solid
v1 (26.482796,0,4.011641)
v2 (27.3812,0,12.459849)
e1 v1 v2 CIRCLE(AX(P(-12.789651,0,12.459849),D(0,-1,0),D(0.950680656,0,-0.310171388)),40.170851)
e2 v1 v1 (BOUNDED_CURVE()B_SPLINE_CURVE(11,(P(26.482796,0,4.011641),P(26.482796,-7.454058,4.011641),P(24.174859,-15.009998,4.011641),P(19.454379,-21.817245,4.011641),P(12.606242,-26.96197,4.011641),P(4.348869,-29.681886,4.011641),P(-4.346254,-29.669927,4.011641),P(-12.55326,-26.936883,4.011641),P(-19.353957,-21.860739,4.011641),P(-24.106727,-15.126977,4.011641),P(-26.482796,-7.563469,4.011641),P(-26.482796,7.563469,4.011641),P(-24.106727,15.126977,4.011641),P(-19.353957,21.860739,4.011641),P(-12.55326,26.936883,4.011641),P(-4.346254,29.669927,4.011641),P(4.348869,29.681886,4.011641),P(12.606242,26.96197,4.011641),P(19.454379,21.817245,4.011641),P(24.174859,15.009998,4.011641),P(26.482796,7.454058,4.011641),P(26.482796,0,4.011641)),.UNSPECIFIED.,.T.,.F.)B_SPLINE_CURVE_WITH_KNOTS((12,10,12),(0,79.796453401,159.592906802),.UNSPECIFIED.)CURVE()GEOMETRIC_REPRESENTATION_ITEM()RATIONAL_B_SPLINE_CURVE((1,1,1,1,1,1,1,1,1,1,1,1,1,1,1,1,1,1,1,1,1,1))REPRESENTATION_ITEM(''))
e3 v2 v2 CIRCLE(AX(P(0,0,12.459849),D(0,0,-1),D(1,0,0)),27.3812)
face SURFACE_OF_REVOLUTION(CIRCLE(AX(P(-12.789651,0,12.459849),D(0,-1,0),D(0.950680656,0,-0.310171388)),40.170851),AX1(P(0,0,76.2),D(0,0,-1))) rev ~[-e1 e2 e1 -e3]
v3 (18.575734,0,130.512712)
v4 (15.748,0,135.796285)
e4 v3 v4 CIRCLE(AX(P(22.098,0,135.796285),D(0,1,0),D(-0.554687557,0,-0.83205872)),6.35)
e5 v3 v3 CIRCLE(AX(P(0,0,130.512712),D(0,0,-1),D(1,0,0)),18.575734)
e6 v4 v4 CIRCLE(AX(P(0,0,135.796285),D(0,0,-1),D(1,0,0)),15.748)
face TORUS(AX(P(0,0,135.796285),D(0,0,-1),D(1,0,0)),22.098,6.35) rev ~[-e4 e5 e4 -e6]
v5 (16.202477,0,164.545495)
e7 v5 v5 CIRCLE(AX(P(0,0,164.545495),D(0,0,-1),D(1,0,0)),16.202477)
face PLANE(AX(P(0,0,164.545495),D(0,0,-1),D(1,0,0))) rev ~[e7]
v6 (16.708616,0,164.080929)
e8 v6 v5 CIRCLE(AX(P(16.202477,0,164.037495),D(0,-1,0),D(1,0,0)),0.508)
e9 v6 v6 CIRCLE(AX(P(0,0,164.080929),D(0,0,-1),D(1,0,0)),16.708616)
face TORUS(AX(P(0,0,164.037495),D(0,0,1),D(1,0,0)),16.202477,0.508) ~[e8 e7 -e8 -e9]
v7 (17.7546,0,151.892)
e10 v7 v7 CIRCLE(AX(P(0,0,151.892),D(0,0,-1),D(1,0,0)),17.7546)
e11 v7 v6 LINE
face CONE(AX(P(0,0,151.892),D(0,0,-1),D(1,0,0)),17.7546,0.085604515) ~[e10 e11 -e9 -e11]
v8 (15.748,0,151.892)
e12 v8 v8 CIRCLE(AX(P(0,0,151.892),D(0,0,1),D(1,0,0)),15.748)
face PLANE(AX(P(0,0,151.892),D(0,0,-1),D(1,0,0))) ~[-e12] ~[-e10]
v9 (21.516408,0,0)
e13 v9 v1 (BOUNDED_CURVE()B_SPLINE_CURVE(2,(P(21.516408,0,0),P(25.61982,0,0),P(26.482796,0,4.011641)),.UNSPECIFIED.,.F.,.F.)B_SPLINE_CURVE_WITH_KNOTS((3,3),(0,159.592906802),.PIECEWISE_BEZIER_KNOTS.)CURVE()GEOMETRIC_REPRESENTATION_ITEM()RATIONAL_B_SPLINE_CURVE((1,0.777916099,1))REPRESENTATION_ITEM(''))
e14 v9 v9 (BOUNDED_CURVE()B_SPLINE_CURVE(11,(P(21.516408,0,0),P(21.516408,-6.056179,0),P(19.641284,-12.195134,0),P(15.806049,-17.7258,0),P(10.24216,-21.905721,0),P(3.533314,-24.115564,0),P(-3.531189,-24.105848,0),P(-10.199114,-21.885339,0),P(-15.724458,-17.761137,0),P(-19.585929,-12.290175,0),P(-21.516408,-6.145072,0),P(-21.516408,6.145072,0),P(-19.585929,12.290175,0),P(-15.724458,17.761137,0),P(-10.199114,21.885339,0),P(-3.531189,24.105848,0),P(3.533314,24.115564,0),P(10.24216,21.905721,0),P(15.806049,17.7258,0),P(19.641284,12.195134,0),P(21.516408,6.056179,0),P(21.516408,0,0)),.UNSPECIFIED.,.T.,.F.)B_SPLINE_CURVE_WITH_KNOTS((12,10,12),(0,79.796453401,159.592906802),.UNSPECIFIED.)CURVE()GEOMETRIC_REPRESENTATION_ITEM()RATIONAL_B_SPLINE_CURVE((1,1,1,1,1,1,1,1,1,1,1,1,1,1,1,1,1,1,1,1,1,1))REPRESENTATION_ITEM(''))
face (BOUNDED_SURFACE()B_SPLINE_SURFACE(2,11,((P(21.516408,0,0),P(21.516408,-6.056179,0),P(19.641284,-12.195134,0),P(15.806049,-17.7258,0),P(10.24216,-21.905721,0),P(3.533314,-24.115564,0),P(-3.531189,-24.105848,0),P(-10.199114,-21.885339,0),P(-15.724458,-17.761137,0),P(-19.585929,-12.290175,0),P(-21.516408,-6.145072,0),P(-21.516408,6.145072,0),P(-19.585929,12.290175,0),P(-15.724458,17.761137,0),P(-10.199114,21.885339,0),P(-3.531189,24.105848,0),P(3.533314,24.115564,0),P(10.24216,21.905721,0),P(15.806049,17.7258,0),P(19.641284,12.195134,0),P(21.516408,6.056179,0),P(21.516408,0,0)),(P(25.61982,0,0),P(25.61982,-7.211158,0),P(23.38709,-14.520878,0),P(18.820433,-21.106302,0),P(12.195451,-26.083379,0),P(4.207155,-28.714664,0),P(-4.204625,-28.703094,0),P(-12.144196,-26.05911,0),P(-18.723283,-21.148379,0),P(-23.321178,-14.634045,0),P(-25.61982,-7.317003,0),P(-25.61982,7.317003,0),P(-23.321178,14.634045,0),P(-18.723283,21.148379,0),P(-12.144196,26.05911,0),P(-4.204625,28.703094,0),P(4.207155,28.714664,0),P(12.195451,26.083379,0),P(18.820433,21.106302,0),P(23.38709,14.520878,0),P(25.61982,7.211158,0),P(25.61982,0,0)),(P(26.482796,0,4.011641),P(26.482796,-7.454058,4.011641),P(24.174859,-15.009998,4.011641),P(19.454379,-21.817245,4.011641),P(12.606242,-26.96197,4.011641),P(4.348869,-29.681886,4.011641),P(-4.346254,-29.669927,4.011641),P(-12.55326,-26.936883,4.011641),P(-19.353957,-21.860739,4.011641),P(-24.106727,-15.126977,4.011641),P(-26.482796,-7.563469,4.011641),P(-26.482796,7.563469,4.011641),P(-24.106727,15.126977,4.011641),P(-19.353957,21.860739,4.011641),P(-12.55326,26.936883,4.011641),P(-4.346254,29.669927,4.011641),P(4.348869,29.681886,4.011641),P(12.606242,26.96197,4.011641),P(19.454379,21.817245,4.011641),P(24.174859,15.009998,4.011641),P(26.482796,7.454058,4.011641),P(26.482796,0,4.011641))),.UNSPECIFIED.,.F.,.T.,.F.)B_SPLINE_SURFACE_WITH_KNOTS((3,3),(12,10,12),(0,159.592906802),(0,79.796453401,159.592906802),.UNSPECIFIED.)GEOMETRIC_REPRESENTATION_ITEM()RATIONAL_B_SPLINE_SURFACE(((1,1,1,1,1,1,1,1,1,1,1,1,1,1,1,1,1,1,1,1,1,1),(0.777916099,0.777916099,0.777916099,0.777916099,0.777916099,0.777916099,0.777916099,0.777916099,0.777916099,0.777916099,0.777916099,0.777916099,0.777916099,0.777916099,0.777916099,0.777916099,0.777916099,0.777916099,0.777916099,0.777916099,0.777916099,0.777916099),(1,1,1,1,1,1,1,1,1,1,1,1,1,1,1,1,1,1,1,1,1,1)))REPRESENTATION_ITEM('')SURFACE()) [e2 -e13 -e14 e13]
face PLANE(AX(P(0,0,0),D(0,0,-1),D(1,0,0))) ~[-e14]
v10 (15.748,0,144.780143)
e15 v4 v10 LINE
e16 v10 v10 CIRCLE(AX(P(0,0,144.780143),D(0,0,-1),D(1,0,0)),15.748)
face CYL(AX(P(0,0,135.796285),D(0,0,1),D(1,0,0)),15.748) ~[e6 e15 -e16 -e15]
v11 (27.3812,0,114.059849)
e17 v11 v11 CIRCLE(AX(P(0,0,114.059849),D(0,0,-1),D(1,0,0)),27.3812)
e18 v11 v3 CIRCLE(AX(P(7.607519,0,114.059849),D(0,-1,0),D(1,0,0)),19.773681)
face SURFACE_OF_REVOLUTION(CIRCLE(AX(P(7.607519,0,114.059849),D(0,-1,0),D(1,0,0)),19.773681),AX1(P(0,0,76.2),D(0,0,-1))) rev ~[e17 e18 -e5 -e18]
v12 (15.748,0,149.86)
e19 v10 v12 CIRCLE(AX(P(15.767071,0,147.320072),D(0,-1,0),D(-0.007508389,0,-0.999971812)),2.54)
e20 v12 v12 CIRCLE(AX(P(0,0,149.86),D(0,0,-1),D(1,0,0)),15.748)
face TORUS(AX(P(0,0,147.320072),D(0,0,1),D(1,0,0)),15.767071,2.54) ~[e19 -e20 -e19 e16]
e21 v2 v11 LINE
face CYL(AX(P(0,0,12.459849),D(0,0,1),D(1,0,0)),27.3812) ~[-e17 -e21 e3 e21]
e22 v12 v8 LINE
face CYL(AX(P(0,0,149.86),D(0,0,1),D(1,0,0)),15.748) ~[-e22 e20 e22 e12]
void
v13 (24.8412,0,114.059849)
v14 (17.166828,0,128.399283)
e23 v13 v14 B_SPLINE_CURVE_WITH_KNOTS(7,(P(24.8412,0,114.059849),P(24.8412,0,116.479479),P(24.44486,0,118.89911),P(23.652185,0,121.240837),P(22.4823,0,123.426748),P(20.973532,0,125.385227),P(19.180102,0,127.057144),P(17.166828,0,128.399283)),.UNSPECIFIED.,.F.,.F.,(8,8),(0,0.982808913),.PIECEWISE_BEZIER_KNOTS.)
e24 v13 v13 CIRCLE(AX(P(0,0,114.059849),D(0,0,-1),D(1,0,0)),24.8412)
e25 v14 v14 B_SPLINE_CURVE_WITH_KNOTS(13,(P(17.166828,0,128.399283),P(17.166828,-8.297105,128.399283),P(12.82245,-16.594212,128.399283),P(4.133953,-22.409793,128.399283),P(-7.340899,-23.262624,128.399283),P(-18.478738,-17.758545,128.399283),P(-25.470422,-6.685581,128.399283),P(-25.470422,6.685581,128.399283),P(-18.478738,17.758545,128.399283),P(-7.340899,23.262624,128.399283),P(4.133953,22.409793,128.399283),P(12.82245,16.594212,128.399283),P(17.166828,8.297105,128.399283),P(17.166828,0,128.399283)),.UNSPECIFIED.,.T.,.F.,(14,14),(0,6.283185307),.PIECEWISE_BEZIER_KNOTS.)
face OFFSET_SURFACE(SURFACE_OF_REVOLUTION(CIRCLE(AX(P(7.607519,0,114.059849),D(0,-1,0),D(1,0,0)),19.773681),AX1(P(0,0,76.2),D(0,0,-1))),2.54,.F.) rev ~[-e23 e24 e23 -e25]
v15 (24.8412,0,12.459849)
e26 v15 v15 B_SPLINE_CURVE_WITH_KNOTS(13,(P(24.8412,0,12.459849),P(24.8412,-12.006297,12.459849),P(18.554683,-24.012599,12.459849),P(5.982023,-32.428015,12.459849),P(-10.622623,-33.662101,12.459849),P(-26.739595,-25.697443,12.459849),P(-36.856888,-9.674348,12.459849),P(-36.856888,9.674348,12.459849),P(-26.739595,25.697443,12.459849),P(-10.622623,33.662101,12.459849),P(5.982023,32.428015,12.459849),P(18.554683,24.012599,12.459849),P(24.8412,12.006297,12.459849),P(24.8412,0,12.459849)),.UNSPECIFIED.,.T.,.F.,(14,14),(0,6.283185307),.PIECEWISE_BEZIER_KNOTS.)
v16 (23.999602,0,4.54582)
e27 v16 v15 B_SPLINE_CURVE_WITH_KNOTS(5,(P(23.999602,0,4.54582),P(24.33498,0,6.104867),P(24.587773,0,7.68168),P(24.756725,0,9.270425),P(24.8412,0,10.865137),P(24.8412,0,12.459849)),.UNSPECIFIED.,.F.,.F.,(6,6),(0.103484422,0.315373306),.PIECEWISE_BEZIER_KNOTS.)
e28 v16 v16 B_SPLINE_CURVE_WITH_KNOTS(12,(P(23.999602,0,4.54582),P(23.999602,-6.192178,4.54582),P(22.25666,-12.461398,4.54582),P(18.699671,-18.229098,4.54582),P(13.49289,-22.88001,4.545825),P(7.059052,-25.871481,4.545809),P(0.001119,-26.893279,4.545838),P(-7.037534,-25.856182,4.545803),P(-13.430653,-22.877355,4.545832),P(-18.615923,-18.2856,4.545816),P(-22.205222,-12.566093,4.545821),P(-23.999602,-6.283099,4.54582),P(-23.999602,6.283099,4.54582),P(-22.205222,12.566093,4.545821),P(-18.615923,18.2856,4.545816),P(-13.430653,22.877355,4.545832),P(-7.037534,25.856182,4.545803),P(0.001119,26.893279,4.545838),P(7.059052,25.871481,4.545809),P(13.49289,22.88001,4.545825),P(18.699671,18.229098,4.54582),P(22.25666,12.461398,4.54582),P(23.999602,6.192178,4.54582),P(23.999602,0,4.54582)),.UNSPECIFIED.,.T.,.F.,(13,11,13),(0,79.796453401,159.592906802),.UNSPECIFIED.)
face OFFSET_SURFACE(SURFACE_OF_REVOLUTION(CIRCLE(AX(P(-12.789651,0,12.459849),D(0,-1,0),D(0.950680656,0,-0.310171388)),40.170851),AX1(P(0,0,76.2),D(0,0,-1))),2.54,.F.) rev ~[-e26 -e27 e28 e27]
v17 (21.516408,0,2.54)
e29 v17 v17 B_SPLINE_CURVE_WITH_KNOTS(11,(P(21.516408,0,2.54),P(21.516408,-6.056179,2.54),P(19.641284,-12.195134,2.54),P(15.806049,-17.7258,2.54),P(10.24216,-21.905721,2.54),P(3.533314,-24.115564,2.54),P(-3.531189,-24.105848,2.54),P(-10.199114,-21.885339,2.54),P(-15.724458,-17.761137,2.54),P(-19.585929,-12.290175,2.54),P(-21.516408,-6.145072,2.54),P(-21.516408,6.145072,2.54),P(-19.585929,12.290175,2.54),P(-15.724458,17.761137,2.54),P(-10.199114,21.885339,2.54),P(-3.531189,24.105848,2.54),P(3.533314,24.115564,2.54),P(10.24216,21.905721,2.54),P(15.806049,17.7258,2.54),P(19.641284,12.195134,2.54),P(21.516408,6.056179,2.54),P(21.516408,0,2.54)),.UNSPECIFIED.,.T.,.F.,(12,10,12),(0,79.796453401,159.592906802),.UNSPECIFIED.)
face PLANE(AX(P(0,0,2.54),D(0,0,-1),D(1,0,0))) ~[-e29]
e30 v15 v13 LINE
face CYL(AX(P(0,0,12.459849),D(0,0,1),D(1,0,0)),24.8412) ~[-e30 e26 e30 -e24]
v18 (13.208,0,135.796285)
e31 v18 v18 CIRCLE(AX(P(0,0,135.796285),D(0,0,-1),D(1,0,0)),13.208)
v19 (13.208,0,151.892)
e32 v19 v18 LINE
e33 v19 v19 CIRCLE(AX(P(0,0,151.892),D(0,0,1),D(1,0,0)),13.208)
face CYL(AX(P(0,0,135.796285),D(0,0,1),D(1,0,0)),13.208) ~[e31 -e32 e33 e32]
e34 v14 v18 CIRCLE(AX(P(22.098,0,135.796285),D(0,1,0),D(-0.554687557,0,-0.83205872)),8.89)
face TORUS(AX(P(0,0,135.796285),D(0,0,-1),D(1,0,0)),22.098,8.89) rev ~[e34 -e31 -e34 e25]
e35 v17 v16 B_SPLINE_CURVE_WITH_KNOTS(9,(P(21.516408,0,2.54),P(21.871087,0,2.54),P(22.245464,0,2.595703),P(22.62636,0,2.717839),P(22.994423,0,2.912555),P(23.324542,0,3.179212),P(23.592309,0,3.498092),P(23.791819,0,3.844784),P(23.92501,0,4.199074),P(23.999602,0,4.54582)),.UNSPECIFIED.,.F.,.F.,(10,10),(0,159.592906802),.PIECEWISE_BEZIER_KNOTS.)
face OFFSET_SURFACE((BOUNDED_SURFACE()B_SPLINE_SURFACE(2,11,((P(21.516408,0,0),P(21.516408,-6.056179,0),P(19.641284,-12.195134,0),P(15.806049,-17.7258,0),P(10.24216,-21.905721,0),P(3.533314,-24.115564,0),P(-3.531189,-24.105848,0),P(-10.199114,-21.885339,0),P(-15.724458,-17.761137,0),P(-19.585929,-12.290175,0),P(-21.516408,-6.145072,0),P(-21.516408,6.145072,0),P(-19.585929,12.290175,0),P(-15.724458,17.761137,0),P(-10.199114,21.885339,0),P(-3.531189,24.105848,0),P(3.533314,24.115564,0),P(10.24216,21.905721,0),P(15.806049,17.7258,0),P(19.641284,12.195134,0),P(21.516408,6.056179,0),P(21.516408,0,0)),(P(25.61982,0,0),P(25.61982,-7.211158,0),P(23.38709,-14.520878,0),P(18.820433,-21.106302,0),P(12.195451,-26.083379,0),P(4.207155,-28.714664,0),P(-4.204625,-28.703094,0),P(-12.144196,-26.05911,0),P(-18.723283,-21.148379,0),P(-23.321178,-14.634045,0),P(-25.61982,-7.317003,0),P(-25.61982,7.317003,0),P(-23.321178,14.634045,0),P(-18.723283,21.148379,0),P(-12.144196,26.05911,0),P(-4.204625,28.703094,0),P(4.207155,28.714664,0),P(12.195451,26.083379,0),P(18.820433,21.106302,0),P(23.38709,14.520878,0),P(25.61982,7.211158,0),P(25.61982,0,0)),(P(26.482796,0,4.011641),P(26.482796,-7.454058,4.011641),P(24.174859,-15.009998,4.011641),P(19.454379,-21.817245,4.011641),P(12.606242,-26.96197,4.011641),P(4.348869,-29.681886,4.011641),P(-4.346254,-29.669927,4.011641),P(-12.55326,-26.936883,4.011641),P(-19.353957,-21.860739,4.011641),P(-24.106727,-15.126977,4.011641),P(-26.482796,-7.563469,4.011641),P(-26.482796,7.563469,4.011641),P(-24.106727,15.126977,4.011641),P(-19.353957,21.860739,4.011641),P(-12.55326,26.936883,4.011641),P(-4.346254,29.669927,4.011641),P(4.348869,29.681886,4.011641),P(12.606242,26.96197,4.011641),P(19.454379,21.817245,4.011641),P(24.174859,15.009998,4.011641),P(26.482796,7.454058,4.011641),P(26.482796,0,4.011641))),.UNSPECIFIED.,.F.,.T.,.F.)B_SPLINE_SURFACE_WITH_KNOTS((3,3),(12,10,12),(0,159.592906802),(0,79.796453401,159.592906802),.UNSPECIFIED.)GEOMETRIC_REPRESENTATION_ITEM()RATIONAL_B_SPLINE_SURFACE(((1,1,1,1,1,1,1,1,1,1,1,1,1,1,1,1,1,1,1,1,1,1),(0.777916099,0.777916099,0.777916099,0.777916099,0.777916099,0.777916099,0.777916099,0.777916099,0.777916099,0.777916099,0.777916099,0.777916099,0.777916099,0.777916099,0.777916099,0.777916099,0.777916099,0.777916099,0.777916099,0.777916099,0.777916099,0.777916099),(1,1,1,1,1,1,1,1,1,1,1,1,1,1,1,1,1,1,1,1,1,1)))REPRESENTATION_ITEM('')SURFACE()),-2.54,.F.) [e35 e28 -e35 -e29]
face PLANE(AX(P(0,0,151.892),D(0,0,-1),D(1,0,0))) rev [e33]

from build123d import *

# Parameters (mm, degrees)
F2_R = 5.08
F3_T = 2.54
F6_R = 0.508


# Not quite as in the source:
# - a shell that OpenCascade refuses in one call is made with other operations: the cavity is built on its own and cut out


with BuildPart() as f1:
    # F0 (on Front) → F1 (revolve)
    with BuildSketch(Plane.XZ):
        with BuildLine():
            Line((0, 152.4), (0, 0))
            Line((0, 0), (25.4, 0))
            ThreePointArc((25.4, 0), (26.8828082767, 6.1516598374), (27.3812, 12.4598485497))
            Line((27.3812, 12.4598485497), (27.3812, 114.0598485497))
            ThreePointArc((27.3812, 114.0598485497), (25.0414004497, 123.390348849), (18.5757340104, 130.5127118886))
            ThreePointArc((18.5757340104, 130.5127118886), (16.4993890547, 132.7999444127), (15.748, 135.796284761))
            Line((15.748, 135.796284761), (15.748, 144.7801431968))
            ThreePointArc((15.748, 144.7801431968), (18.3070713092, 147.3200715984), (15.748, 149.86))
            Line((15.748, 149.86), (15.748, 152.4))
            Line((15.748, 152.4), (0, 152.4))
        make_face()
    revolve(axis=Axis((0, 0, 76.2), (0, 0, -1)))

    # F2
    f2_edges = [f1.edges().sort_by_distance(p)[0] for p in [
        (-25.4, 0, 0),
    ]]
    fillet(f2_edges, radius=F2_R)

    # F3: shell of thickness 2.54, made by hand


with BuildPart() as f3_core1:
    # F3_t2: copy of F1
    add(f1.part)

    # the walls: a layer under each face that stays
    f3_faces = [f3_core1.faces().sort_by_distance(p)[0] for p in [
        (0, 0, 0),
        (-24.7085178809, 0, 1.1281862172),
        (-27.1559674596, 0, 8.2119271912),
        (-27.3812, 0, 63.2598485497),
        (-25.0414004497, 0, 123.390348849),
        (-16.4993890547, 0, 132.7999444127),
        (-15.748, 0, 140.2882139789),
        (-15.748, 0, 151.13),
    ]]
    thicken(f3_faces, amount=-F3_T, mode=Mode.SUBTRACT)

    # F3_s3 → F3_t4 (revolve, cut)
    with BuildSketch(Plane.XZ):
        Polygon((15.7732092869, 144.7547439128), (13.208, 144.7801431968), (13.208, 147.3392866441), (15.7670713092, 147.3200715984), align=None)
    revolve(axis=Axis((0, 0, 144.7801431968), (0, 0, -1)), mode=Mode.SUBTRACT)

    # F3_s5 → F3_t6 (revolve, cut)
    with BuildSketch(Plane.XZ):
        Polygon((15.7732092869, 149.885399284), (15.7670713092, 147.3200715984), (13.208, 147.3008565527), (13.208, 149.86), align=None)
    revolve(axis=Axis((0, 0, 149.86), (0, 0, -1)), mode=Mode.SUBTRACT)


with BuildPart() as f1_1:
    add(f1.part)

    # what is left inside the walls is the cavity
    f3_cavity = [f3_core1.part.solids().sort_by_distance(p)[0] for p in [
        (-24.8158, 0, 46.326515),
    ]]
    add(f3_cavity, mode=Mode.SUBTRACT)

    # F4 (on Front) → F5 (revolve)
    with BuildSketch(Plane.XZ):
        Polygon((0, 164.5454947654), (0, 151.892), (17.7546, 151.892), (16.66875, 164.5454947654), align=None)
    revolve(axis=Axis((0, 0, 158.2187473827), (0, 0, -1)))

    # F6
    f6_edges = [f1_1.edges().sort_by_distance(p)[0] for p in [
        (-16.66875, 0, 164.545495),
    ]]
    fillet(f6_edges, radius=F6_R)


solid = f1_1.part
